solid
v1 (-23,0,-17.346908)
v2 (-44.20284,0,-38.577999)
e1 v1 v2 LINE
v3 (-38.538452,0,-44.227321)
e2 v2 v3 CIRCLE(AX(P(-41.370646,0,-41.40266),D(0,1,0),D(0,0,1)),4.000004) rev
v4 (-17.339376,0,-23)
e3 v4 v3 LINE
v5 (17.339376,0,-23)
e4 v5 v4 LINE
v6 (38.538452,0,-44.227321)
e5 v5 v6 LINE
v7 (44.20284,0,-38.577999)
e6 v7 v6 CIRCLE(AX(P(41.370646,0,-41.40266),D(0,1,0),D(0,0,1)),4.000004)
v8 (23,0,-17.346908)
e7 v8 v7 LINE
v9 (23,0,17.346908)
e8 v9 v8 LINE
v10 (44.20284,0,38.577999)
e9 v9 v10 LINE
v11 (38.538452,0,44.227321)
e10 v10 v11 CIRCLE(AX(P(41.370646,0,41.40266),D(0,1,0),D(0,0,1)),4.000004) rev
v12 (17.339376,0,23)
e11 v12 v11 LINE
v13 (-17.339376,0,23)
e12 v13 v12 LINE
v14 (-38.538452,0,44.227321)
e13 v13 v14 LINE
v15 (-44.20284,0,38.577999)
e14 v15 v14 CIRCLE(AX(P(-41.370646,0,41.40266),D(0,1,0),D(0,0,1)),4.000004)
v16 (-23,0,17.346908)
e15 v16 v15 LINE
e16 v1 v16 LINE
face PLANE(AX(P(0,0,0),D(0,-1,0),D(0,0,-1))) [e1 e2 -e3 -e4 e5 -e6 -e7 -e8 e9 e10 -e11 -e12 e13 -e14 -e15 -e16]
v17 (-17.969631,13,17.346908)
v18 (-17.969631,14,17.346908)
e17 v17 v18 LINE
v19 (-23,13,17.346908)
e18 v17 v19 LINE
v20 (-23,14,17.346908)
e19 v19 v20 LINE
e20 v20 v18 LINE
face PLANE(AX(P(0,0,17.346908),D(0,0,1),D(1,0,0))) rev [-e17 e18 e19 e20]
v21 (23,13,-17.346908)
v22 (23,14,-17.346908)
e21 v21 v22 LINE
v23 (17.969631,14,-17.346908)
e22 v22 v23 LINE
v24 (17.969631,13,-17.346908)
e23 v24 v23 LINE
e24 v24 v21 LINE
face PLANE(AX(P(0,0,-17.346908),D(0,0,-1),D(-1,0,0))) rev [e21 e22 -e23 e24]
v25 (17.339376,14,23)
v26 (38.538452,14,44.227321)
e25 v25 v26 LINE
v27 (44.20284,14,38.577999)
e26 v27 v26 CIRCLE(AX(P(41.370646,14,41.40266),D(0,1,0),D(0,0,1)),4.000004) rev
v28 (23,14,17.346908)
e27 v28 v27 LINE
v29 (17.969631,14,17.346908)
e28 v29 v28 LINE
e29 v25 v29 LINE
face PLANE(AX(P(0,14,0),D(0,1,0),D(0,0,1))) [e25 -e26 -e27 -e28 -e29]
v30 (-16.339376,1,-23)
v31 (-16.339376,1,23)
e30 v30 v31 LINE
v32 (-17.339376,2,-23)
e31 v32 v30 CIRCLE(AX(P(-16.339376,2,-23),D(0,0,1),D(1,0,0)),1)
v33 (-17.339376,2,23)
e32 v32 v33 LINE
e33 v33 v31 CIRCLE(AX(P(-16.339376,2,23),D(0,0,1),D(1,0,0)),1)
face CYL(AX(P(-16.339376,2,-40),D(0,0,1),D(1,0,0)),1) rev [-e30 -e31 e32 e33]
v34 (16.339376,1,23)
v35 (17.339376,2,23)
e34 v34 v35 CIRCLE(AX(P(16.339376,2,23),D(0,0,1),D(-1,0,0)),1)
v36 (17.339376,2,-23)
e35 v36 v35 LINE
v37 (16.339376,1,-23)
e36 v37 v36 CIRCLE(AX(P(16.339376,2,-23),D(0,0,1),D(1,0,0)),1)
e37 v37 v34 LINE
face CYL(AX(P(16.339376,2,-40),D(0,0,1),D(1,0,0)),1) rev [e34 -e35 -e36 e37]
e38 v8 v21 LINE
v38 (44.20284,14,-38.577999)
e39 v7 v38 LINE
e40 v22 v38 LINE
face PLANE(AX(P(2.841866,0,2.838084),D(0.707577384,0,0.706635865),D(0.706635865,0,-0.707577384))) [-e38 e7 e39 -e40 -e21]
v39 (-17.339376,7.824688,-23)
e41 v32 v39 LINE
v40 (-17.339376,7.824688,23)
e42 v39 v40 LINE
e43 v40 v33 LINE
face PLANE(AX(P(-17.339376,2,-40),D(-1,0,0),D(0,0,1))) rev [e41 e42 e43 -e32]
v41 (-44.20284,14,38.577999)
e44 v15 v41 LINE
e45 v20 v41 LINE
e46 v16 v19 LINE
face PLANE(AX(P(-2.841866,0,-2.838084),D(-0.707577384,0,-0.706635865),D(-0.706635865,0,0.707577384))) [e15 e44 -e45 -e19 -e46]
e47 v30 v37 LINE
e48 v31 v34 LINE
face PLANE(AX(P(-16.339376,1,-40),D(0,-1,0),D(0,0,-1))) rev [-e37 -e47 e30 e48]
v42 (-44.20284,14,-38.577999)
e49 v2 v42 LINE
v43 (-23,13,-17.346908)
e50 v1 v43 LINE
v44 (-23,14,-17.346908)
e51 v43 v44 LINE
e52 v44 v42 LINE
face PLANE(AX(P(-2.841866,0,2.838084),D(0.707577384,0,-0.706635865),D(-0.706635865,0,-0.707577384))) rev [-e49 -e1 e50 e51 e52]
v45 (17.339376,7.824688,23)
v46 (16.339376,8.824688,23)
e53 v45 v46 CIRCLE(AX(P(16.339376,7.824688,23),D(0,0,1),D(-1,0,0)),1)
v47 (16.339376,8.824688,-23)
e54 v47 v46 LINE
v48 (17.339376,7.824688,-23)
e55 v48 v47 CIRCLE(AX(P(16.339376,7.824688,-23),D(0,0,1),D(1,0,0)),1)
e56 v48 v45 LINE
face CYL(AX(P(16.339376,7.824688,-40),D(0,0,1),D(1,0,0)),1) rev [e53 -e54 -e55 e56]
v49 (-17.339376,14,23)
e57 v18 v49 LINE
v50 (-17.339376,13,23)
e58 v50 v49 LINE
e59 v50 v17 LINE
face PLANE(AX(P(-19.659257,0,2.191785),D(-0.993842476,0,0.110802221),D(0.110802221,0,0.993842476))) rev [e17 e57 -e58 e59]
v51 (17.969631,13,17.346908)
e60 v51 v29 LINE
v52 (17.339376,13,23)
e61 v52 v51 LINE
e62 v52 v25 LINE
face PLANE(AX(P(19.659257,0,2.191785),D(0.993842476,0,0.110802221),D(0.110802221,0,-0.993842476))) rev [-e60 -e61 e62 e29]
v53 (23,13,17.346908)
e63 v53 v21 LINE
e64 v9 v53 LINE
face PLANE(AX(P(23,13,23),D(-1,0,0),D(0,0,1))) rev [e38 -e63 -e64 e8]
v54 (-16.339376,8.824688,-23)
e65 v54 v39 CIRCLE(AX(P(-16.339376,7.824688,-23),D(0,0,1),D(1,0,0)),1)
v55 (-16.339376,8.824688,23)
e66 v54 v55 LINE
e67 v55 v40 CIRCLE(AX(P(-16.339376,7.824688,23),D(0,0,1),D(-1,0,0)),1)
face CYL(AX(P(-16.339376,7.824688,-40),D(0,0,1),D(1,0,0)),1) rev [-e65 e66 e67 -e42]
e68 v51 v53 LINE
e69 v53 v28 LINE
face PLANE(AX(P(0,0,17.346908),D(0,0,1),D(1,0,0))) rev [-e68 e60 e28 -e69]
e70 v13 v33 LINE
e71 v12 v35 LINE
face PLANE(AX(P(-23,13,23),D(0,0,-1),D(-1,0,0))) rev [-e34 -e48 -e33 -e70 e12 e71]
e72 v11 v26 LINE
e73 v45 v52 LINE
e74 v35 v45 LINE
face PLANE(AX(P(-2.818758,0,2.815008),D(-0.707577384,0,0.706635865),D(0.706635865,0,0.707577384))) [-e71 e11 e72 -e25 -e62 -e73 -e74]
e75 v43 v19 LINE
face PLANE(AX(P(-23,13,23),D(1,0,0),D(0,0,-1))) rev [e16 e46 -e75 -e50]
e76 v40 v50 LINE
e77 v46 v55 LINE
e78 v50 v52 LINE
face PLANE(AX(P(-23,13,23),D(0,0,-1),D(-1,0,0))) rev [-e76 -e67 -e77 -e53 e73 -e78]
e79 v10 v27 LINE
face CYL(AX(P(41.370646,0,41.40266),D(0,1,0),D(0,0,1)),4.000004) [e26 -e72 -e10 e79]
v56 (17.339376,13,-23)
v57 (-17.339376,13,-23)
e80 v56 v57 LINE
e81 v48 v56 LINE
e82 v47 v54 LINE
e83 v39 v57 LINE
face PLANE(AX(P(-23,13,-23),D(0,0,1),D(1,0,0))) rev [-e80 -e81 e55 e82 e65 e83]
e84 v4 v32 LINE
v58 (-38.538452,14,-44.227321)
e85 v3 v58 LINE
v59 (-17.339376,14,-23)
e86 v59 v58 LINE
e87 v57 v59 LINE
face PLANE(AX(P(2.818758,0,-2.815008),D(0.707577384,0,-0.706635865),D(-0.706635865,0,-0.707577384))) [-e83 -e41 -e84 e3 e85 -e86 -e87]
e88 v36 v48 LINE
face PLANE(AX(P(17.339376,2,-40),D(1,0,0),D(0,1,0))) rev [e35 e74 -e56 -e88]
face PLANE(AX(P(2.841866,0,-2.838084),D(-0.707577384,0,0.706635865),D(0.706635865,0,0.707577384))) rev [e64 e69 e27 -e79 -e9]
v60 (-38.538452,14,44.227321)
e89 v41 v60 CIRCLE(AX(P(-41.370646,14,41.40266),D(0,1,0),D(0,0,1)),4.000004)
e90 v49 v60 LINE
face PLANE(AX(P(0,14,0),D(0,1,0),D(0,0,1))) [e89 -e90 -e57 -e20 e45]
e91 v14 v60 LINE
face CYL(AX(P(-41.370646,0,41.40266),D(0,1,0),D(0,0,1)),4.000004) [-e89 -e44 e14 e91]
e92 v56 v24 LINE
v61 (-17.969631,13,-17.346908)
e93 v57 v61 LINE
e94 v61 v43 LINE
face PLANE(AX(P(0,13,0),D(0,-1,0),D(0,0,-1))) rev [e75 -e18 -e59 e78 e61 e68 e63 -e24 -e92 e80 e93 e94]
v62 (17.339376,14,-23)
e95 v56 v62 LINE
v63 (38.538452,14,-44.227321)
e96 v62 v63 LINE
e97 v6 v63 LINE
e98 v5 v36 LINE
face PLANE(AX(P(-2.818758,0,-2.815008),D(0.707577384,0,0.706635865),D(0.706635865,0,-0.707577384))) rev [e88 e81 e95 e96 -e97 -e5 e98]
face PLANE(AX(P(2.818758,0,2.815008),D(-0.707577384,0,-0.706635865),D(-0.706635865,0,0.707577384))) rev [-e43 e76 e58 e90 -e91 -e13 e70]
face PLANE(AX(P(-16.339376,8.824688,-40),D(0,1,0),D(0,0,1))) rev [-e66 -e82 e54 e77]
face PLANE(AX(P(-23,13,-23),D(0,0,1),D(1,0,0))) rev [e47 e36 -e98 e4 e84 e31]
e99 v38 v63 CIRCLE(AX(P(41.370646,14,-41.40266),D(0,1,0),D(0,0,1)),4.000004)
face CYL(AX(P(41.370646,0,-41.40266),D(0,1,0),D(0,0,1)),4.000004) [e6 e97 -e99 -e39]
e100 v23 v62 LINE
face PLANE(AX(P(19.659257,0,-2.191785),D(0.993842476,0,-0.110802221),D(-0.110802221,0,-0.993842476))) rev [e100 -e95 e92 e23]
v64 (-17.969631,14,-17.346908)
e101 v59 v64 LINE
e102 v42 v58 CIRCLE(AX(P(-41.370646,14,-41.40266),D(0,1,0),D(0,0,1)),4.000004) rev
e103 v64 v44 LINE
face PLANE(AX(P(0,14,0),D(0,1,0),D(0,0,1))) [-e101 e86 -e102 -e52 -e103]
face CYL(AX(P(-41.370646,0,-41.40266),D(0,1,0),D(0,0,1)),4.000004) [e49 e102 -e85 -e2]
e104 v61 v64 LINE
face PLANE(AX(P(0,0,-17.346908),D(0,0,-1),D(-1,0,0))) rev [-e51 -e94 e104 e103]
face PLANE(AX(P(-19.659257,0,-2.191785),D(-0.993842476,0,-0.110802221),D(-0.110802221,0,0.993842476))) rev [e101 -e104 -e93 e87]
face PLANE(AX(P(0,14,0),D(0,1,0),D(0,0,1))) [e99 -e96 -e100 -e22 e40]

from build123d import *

# Parameters (mm, degrees)
SKETCH1_W           = 46
SKETCH1_H           = 46
BOSS_EXTRUDE1_DEPTH = 13
CUT_EXTRUDE2_DEPTH  = 10
BOSS_EXTRUDE2_START = -13
BOSS_EXTRUDE2_DEPTH = 14
CUT_EXTRUDE4_DEPTH  = 63


# Read off the part's stored shape, not the designer's step: Boss-Extrude2
with BuildPart() as part:
    # Sketch1 → Boss-Extrude1 (new body)
    with BuildSketch(Plane(origin=(0, 0, 0), x_dir=(1, 0, 0), z_dir=(0, 1, 0))):
        Rectangle(SKETCH1_W, SKETCH1_H)
    extrude(amount=BOSS_EXTRUDE1_DEPTH)

    # Sketch2 → Cut-Extrude2 (cut)
    with BuildSketch(Plane(origin=(0, 13, 0), x_dir=(1, 0, 0), z_dir=(0, 1, 0))):
        Polygon((17.339375574, 23), (17.969631493, 17.346908404), (23, 17.346908404), (23, 23), align=None)
        Polygon((-23, 23), (-17.339375574, 23), (-17.969631493, 17.346908404), (-23, 17.346908404), align=None)
        Polygon((-23, -17.346908404), (-23, -23), (-17.339375574, -23), (-17.969631493, -17.346908404), align=None)
        Polygon((17.339375574, -23), (23, -23), (23, -17.346908404), (17.969631493, -17.346908404), align=None)
    extrude(amount=-CUT_EXTRUDE2_DEPTH, mode=Mode.SUBTRACT)

    # Boss-Extrude2 outline → Boss-Extrude2 (add)
    with BuildSketch(Plane(origin=(0, 13, 0), x_dir=(1, 0, 0), z_dir=(0, 1, 0)).offset(BOSS_EXTRUDE2_START)):
        with BuildLine():
            Line((-38.538452146, -44.227320898), (-17.339375574, -23))
            Line((-17.339375574, -23), (-17.969631493, -17.346908404))
            Line((-17.969631493, -17.346908404), (-23, -17.346908404))
            Line((-23, -17.346908404), (-44.202839223, -38.577999476))
            ThreePointArc((-44.202839223, -38.577999476), (-44.195306563, -44.234853893), (-38.538452146, -44.227320898))
        make_face()
        with BuildLine():
            Line((-17.969631493, 17.346908404), (-17.339375574, 23))
            Line((-17.339375574, 23), (-38.538452146, 44.227320898))
            ThreePointArc((-38.538452146, 44.227320898), (-44.195306563, 44.234853893), (-44.202839223, 38.577999476))
            Line((-44.202839223, 38.577999476), (-23, 17.346908404))
            Line((-23, 17.346908404), (-17.969631493, 17.346908404))
        make_face()
        with BuildLine():
            Line((44.202839223, -38.577999476), (23, -17.346908404))
            Line((23, -17.346908404), (17.969631493, -17.346908404))
            Line((17.969631493, -17.346908404), (17.339375574, -23))
            Line((17.339375574, -23), (38.538452146, -44.227320898))
            ThreePointArc((38.538452146, -44.227320898), (44.195306563, -44.234853893), (44.202839223, -38.577999476))
        make_face()
        with BuildLine():
            Line((17.969631493, 17.346908404), (23, 17.346908404))
            Line((23, 17.346908404), (44.202839223, 38.577999476))
            ThreePointArc((44.202839223, 38.577999476), (44.195306563, 44.234853893), (38.538452146, 44.227320898))
            Line((38.538452146, 44.227320898), (17.339375574, 23))
            Line((17.339375574, 23), (17.969631493, 17.346908404))
        make_face()
    extrude(amount=BOSS_EXTRUDE2_DEPTH)

    # Sketch5 → Cut-Extrude4 (cut)
    with BuildSketch(Plane.XY.offset(23)):
        with BuildLine():
            Line((-16.339375574, 1), (16.339375574, 1))
            ThreePointArc((16.339375574, 1), (17.046482355, 1.292893219), (17.339375574, 2))
            Line((17.339375574, 2), (17.339375574, 7.824688375))
            ThreePointArc((17.339375574, 7.824688375), (17.046482355, 8.531795157), (16.339375574, 8.824688375))
            Line((16.339375574, 8.824688375), (-16.339375574, 8.824688375))
            ThreePointArc((-16.339375574, 8.824688375), (-17.046482355, 8.531795157), (-17.339375574, 7.824688375))
            Line((-17.339375574, 7.824688375), (-17.339375574, 2))
            ThreePointArc((-17.339375574, 2), (-17.046482355, 1.292893219), (-16.339375574, 1))
        make_face()
    extrude(amount=-CUT_EXTRUDE4_DEPTH, mode=Mode.SUBTRACT)


solid = part.part
